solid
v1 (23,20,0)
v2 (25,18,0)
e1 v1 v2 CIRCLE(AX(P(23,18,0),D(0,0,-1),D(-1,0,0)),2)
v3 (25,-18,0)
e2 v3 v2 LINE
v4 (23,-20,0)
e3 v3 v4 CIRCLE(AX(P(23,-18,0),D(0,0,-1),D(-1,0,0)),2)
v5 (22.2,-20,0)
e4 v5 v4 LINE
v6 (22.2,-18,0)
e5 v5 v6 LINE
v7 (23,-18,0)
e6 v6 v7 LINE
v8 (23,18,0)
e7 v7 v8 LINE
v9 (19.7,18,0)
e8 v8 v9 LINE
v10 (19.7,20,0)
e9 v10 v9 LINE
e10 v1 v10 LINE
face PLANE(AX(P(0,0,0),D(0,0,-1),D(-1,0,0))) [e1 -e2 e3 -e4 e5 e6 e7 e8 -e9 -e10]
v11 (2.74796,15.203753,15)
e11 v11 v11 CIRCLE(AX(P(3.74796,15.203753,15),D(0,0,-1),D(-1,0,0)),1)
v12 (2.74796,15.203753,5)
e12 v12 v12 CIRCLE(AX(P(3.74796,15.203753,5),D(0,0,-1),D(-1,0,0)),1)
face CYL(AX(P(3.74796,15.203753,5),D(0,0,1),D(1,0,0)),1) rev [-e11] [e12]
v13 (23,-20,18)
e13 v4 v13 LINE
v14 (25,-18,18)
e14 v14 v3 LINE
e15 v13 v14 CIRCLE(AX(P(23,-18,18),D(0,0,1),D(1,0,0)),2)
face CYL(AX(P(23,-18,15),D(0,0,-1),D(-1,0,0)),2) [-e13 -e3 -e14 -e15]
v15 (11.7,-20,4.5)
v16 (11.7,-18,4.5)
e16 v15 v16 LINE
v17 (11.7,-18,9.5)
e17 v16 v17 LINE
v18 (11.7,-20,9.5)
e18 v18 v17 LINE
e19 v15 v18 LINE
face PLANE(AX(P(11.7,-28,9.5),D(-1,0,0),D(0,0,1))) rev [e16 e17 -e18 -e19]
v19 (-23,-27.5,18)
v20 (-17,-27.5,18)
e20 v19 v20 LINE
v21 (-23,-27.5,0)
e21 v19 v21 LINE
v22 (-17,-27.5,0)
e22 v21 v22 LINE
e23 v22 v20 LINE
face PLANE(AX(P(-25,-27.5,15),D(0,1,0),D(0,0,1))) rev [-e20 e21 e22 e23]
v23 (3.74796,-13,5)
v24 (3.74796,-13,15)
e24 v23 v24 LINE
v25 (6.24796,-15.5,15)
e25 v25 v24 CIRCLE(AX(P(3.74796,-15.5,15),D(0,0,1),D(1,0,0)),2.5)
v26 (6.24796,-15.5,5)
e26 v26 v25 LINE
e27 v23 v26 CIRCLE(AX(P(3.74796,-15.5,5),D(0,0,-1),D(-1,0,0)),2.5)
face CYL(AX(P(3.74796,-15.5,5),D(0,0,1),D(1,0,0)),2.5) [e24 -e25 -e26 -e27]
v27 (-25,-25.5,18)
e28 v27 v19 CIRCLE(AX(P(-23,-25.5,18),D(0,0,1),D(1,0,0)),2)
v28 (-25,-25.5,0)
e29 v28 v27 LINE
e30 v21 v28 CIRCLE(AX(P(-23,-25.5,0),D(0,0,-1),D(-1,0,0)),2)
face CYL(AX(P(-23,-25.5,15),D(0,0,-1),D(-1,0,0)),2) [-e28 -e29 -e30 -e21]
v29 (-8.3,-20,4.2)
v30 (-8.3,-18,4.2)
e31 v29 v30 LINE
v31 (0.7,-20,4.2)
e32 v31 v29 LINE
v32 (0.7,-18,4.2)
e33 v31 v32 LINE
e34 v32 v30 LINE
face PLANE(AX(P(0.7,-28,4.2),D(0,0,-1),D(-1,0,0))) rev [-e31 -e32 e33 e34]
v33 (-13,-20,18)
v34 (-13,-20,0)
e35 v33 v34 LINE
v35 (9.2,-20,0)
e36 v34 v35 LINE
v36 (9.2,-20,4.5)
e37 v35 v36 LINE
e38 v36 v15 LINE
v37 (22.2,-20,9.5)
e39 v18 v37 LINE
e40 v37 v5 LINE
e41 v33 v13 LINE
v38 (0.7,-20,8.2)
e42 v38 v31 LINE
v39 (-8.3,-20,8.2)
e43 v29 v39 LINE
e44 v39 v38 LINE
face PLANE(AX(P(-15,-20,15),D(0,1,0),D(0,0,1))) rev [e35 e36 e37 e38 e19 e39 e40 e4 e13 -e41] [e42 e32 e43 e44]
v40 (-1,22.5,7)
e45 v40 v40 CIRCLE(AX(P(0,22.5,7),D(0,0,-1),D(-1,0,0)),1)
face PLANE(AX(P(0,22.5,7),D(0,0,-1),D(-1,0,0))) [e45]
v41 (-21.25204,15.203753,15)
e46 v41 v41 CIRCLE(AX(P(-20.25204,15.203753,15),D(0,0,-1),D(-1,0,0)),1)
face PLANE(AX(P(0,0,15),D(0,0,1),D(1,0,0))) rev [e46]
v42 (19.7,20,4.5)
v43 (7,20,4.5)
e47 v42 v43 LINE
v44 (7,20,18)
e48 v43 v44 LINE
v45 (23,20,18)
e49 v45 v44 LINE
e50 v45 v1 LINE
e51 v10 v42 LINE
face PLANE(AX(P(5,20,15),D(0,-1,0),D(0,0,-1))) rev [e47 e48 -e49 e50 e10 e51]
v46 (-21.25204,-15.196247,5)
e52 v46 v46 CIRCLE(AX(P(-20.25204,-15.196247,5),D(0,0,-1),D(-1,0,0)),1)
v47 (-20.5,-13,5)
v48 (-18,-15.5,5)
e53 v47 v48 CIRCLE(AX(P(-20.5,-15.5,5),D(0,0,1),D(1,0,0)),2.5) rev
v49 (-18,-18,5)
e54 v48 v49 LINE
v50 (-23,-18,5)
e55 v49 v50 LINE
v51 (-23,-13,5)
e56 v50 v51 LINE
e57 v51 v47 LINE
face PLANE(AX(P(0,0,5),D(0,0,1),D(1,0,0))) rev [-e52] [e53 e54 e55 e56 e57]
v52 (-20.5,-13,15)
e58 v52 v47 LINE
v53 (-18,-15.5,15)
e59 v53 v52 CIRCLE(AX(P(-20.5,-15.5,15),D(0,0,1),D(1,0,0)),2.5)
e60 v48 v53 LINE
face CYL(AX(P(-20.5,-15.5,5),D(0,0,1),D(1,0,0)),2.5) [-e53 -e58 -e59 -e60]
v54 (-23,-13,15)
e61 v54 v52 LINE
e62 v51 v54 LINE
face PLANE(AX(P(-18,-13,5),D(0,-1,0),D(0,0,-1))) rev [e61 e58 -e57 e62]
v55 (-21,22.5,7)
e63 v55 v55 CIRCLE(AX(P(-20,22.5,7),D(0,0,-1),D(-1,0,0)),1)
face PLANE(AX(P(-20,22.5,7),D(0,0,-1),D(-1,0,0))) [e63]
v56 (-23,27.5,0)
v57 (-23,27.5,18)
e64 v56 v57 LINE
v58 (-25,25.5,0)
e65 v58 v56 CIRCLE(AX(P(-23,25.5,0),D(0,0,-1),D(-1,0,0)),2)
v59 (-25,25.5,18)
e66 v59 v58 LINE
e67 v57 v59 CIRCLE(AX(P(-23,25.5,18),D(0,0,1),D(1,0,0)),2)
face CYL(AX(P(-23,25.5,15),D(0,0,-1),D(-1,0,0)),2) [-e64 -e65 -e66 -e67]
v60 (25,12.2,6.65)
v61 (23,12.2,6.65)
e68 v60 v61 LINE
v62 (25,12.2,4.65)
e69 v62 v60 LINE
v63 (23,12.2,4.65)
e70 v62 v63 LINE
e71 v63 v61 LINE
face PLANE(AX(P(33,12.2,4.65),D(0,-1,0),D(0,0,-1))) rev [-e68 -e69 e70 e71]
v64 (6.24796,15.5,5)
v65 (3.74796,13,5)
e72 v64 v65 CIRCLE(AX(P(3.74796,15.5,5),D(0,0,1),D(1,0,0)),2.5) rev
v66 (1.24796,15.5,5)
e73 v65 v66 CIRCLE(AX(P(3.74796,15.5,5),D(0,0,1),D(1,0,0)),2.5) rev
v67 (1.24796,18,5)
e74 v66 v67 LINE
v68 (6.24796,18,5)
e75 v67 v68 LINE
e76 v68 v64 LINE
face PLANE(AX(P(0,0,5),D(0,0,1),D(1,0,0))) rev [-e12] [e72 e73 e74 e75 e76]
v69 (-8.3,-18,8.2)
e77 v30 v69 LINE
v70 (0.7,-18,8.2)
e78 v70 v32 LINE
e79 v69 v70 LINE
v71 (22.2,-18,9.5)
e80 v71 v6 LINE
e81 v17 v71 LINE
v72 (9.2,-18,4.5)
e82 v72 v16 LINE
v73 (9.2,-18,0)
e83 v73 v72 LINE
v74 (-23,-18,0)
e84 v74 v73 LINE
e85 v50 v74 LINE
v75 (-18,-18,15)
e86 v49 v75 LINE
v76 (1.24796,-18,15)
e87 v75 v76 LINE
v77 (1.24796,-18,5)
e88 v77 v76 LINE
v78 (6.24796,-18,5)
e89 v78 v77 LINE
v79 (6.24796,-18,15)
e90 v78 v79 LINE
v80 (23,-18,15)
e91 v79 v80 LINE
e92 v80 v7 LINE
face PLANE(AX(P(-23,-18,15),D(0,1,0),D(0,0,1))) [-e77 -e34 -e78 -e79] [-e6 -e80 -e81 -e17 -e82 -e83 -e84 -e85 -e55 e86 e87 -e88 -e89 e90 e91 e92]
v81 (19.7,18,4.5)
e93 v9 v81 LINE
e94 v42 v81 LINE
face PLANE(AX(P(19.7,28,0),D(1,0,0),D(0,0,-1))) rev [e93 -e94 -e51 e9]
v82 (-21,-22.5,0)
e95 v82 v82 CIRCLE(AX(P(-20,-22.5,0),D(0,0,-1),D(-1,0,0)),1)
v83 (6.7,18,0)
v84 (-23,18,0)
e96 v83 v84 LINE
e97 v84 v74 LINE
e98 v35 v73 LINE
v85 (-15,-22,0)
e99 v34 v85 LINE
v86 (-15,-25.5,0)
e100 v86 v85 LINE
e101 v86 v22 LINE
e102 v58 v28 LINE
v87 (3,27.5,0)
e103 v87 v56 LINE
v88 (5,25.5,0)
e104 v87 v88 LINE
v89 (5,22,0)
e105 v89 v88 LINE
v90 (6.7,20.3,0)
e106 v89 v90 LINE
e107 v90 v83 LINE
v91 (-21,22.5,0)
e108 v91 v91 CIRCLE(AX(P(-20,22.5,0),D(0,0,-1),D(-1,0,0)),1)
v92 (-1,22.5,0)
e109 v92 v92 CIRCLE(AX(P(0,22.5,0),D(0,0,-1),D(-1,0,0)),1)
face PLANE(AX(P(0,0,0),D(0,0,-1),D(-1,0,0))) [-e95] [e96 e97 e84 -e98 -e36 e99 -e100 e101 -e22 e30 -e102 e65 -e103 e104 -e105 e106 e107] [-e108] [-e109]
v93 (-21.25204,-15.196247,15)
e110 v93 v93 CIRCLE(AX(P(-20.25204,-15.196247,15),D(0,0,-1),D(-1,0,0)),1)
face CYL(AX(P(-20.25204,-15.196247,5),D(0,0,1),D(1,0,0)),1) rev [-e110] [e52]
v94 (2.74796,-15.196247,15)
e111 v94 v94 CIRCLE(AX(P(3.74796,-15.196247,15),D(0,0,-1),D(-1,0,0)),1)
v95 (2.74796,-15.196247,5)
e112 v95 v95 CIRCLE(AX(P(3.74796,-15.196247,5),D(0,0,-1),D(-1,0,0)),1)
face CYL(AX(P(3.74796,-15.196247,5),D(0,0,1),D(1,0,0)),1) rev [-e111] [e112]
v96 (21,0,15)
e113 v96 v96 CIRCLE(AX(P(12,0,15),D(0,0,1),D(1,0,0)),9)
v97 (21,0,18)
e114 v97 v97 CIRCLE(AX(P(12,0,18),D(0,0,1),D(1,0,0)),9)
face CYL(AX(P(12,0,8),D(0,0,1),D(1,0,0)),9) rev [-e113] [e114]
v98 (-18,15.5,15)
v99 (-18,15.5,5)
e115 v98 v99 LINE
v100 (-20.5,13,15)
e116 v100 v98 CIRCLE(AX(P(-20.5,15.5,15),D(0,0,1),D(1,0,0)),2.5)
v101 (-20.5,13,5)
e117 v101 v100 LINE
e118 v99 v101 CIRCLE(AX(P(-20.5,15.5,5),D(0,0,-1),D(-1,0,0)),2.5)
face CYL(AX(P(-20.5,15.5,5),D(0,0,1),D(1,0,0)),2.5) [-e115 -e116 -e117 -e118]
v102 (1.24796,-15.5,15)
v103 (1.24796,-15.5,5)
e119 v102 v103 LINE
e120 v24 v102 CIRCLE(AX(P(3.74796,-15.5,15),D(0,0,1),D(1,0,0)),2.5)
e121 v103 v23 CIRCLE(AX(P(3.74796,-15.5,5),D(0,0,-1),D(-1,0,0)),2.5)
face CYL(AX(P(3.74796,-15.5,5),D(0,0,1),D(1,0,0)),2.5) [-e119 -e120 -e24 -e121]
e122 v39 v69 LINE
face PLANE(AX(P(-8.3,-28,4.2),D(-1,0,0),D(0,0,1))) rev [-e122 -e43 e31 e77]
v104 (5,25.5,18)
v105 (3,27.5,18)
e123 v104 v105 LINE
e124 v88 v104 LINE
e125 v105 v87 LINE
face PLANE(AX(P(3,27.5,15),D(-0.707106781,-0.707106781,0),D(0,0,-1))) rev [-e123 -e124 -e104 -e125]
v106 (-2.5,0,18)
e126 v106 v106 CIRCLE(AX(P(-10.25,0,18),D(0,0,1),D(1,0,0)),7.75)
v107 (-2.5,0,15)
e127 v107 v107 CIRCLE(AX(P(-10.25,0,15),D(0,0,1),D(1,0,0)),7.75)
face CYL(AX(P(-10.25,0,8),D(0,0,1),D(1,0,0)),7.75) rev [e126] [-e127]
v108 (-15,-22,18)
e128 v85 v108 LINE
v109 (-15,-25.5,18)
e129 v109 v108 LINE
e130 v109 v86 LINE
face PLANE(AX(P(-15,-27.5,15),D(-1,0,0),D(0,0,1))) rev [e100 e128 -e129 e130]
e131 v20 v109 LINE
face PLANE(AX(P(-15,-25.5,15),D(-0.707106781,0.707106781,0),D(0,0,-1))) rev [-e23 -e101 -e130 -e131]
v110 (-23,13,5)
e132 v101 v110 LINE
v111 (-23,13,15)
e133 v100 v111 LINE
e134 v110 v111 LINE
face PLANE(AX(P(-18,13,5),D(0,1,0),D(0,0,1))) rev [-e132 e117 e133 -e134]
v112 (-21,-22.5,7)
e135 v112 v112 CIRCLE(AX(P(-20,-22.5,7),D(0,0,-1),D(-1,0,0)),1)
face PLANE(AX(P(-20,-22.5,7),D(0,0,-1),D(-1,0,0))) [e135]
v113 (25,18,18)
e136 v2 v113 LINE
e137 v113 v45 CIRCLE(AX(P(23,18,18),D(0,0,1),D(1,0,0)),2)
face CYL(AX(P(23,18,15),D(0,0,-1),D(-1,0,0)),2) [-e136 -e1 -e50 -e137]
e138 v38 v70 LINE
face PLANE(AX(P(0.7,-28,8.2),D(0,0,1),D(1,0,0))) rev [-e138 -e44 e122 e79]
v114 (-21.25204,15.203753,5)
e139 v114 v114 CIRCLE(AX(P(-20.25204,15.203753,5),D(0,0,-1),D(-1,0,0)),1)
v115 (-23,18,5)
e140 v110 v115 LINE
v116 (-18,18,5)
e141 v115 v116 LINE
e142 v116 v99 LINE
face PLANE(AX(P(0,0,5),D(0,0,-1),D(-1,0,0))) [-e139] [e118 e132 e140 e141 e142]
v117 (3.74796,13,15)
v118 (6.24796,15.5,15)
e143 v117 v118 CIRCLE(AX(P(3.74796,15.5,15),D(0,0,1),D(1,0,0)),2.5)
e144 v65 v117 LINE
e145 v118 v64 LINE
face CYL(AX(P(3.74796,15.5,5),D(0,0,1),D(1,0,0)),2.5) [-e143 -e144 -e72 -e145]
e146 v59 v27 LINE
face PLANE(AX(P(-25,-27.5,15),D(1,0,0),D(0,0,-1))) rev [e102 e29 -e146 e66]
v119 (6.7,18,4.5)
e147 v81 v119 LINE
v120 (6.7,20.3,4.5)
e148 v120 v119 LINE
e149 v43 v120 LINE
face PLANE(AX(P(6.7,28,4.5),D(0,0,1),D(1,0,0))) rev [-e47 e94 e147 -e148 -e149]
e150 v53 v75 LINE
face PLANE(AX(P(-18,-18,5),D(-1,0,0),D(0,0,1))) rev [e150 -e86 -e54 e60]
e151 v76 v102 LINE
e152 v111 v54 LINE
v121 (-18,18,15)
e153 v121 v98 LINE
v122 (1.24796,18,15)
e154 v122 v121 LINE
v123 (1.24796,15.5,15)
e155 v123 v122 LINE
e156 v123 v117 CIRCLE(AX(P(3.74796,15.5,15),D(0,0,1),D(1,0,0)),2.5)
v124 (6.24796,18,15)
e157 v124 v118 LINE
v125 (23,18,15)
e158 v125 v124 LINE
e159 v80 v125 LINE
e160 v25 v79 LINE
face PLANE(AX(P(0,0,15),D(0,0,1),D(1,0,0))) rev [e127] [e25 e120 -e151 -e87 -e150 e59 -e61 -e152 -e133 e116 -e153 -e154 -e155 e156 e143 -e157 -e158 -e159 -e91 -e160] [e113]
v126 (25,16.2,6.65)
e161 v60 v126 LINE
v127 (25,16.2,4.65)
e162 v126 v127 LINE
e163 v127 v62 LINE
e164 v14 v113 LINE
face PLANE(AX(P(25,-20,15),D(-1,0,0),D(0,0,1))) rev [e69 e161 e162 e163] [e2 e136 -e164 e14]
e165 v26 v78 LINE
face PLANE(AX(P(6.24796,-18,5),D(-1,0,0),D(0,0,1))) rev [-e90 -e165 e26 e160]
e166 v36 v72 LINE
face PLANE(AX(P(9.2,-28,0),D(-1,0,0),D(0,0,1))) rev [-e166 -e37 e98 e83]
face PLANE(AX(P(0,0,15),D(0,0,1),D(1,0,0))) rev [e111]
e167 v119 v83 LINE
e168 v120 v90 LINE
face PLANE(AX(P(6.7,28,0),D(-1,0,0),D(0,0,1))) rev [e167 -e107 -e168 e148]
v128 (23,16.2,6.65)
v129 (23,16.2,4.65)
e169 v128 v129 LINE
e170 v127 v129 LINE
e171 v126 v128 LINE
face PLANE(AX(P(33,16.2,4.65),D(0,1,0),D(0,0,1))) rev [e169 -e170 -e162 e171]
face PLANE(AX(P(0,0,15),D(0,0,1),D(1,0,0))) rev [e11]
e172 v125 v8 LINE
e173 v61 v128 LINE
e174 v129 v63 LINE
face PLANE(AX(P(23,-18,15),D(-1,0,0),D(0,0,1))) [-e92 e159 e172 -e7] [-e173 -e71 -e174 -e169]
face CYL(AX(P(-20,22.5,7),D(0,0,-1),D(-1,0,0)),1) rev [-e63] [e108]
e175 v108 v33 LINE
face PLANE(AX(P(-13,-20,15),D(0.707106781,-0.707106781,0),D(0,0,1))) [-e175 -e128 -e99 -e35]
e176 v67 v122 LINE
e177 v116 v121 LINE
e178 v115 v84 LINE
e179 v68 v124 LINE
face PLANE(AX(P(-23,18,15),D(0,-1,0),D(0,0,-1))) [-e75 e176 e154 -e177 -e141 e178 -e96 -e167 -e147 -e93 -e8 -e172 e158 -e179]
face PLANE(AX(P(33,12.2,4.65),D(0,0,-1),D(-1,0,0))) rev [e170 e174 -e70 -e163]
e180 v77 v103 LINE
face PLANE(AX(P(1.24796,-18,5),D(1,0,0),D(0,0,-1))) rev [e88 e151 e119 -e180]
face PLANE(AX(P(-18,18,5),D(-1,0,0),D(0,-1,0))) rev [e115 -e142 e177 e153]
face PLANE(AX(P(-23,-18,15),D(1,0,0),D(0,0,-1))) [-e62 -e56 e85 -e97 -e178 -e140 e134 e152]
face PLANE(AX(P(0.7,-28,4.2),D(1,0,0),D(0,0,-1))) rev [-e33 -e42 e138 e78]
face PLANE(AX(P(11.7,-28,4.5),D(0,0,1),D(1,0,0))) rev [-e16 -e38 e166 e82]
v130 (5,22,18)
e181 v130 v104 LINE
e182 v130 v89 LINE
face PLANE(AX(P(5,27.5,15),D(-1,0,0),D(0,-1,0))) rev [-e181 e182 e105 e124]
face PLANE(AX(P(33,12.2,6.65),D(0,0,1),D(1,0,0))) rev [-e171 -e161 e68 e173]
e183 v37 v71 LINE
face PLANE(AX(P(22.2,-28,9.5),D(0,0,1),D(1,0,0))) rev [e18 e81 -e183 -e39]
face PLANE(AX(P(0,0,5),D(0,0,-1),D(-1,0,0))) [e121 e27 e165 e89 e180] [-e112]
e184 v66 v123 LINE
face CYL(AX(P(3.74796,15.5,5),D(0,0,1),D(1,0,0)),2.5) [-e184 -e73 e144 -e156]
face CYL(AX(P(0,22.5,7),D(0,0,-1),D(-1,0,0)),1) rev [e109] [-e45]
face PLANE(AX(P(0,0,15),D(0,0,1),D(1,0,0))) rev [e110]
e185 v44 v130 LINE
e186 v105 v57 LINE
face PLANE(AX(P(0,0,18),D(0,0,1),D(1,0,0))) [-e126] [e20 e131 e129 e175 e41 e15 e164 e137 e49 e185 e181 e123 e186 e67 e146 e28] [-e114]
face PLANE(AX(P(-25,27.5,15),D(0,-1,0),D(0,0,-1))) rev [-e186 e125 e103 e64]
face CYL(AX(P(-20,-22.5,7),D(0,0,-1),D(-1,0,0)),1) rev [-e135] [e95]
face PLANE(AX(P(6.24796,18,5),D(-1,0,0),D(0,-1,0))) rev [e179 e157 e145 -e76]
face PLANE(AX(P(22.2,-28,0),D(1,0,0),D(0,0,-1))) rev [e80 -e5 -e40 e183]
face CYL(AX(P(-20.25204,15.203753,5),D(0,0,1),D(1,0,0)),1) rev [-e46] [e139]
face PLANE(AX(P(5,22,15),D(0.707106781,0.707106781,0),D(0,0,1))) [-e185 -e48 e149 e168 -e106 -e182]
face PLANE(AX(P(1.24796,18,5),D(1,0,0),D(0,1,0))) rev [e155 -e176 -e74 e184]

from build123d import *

# Parameters (mm, degrees)
SKETCH1_W           = 46
SKETCH1_H           = 36
BOSS_EXTRUDE1_DEPTH = 15
BOSS_EXTRUDE2_DEPTH = 3
SKETCH3_R           = 7.75
SKETCH3_R_2         = 9
CUT_EXTRUDE1_DEPTH  = 10
SKETCH4_W           = 5
SKETCH4_H           = 5
SKETCH4_R           = 1
BOSS_EXTRUDE3_DEPTH = 10
FILLET1_R           = 2.5
SKETCH6_R           = 1
CUT_EXTRUDE2_DEPTH  = 10
CHAMFER1_SIZE       = 2
FILLET2_R           = 2
SKETCH7_W           = 13
SKETCH7_H           = 4.5
CUT_EXTRUDE3_DEPTH  = 10
SKETCH8_W           = 9
SKETCH8_H           = 4
CUT_EXTRUDE4_DEPTH  = 10
SKETCH9_W           = 2
SKETCH9_H           = 4
CUT_EXTRUDE5_DEPTH  = 10


with BuildPart() as part:
    # Sketch1 → Boss-Extrude1 (new body)
    with BuildSketch(Plane.XY):
        Polygon((-15, -27.5), (-15, -20), (25, -20), (25, 20), (5, 20), (5, 27.5), (-25, 27.5), (-25, -27.5), align=None)
        Rectangle(SKETCH1_W, SKETCH1_H, mode=Mode.SUBTRACT)
    extrude(amount=BOSS_EXTRUDE1_DEPTH)

    # Sketch2 → Boss-Extrude2 (add)
    with BuildSketch(Plane.XY.offset(15)):
        Polygon((-25, 27.5), (-25, -27.5), (-15, -27.5), (-15, -20), (25, -20), (25, 20), (5, 20), (5, 27.5), align=None)
    extrude(amount=BOSS_EXTRUDE2_DEPTH)

    # Sketch3 → Cut-Extrude1 (cut)
    with BuildSketch(Plane.XY.offset(18)):
        with Locations((-10.25, 0)):
            Circle(SKETCH3_R)
        with Locations((12, 0)):
            Circle(SKETCH3_R_2)
    extrude(amount=-CUT_EXTRUDE1_DEPTH, mode=Mode.SUBTRACT)

    # Sketch4 → Boss-Extrude3 (add)
    # profile 1 of 4: a face of its own
    with BuildSketch(Plane(origin=(0, 0, 15), x_dir=(-1, 0, 0), z_dir=(0, 0, -1))):
        with Locations((20.5, -15.5)):
            Rectangle(SKETCH4_W, SKETCH4_H)
        with Locations((20.252039878, -15.196246514)):
            Circle(SKETCH4_R, mode=Mode.SUBTRACT)
    # profile 2 of 4: a face of its own
    with BuildSketch(Plane(origin=(0, 0, 15), x_dir=(-1, 0, 0), z_dir=(0, 0, -1))):
        with Locations((-3.747960122, -15.5)):
            Rectangle(SKETCH4_W, SKETCH4_H)
        with Locations((-3.747960122, -15.196246514)):
            Circle(SKETCH4_R, mode=Mode.SUBTRACT)
    # profile 3 of 4: a face of its own
    with BuildSketch(Plane(origin=(0, 0, 15), x_dir=(-1, 0, 0), z_dir=(0, 0, -1))):
        with Locations((-3.747960122, 15.5)):
            Rectangle(SKETCH4_W, SKETCH4_H)
        with Locations((-3.747960122, 15.203753486)):
            Circle(SKETCH4_R, mode=Mode.SUBTRACT)
    # profile 4 of 4: a face of its own
    with BuildSketch(Plane(origin=(0, 0, 15), x_dir=(-1, 0, 0), z_dir=(0, 0, -1))):
        with Locations((20.5, 15.5)):
            Rectangle(SKETCH4_W, SKETCH4_H)
        with Locations((20.252039878, 15.203753486)):
            Circle(SKETCH4_R, mode=Mode.SUBTRACT)
    extrude(amount=BOSS_EXTRUDE3_DEPTH)

    # Fillet1
    fillet1_edges = [part.edges().sort_by_distance(p)[0] for p in [
        (1.247960122, 13, 10),
        (6.247960122, 13, 10),
        (-18, 13, 10),
        (-18, -13, 10),
        (1.247960122, -13, 10),
        (6.247960122, -13, 10),
    ]]
    fillet(fillet1_edges, radius=FILLET1_R - 0.0001)  # a hair under: the kernel refuses the full size

    # Sketch6 → Cut-Extrude2 (cut)
    with BuildSketch(Plane(origin=(0, 0, -3), x_dir=(-1, 0, 0), z_dir=(0, 0, -1))):
        with Locations((0, 22.5)):
            Circle(SKETCH6_R)
        with Locations((20, 22.5)):
            Circle(SKETCH6_R)
        with Locations((20, -22.5)):
            Circle(SKETCH6_R)
    extrude(amount=-CUT_EXTRUDE2_DEPTH, mode=Mode.SUBTRACT)

    # Chamfer1
    chamfer1_edges = [part.edges().sort_by_distance(p)[0] for p in [
        (5, 27.5, 9),
        (5, 20, 9),
        (-15, -20, 9),
        (-15, -27.5, 9),
    ]]
    chamfer(chamfer1_edges, length=CHAMFER1_SIZE)

    # Fillet2
    fillet2_edges = [part.edges().sort_by_distance(p)[0] for p in [
        (-25, 27.5, 9),
        (25, 20, 9),
        (25, -20, 9),
        (-25, -27.5, 9),
    ]]
    fillet(fillet2_edges, radius=FILLET2_R)

    # Sketch7 → Cut-Extrude3 (cut)
    with BuildSketch(Plane.XZ.offset(-18)):
        with Locations((13.2, 2.25)):
            Rectangle(SKETCH7_W, SKETCH7_H)
    extrude(amount=-CUT_EXTRUDE3_DEPTH, mode=Mode.SUBTRACT)

    # Sketch8 → Cut-Extrude4 (cut)
    with BuildSketch(Plane(origin=(0, -18, 0), x_dir=(1, 0, 0), z_dir=(0, 1, 0))):
        Polygon((22.2, 0), (9.2, 0), (9.2, -4.5), (11.7, -4.5), (11.7, -9.5), (22.2, -9.5), align=None)
        with Locations((-3.8, -6.2)):
            Rectangle(SKETCH8_W, SKETCH8_H)
    extrude(amount=-CUT_EXTRUDE4_DEPTH, mode=Mode.SUBTRACT)

    # Sketch9 → Cut-Extrude5 (cut)
    with BuildSketch(Plane.ZY.offset(-23)):
        with Locations((5.65, 14.2)):
            Rectangle(SKETCH9_W, SKETCH9_H)
    extrude(amount=-CUT_EXTRUDE5_DEPTH, mode=Mode.SUBTRACT)


solid = part.part
